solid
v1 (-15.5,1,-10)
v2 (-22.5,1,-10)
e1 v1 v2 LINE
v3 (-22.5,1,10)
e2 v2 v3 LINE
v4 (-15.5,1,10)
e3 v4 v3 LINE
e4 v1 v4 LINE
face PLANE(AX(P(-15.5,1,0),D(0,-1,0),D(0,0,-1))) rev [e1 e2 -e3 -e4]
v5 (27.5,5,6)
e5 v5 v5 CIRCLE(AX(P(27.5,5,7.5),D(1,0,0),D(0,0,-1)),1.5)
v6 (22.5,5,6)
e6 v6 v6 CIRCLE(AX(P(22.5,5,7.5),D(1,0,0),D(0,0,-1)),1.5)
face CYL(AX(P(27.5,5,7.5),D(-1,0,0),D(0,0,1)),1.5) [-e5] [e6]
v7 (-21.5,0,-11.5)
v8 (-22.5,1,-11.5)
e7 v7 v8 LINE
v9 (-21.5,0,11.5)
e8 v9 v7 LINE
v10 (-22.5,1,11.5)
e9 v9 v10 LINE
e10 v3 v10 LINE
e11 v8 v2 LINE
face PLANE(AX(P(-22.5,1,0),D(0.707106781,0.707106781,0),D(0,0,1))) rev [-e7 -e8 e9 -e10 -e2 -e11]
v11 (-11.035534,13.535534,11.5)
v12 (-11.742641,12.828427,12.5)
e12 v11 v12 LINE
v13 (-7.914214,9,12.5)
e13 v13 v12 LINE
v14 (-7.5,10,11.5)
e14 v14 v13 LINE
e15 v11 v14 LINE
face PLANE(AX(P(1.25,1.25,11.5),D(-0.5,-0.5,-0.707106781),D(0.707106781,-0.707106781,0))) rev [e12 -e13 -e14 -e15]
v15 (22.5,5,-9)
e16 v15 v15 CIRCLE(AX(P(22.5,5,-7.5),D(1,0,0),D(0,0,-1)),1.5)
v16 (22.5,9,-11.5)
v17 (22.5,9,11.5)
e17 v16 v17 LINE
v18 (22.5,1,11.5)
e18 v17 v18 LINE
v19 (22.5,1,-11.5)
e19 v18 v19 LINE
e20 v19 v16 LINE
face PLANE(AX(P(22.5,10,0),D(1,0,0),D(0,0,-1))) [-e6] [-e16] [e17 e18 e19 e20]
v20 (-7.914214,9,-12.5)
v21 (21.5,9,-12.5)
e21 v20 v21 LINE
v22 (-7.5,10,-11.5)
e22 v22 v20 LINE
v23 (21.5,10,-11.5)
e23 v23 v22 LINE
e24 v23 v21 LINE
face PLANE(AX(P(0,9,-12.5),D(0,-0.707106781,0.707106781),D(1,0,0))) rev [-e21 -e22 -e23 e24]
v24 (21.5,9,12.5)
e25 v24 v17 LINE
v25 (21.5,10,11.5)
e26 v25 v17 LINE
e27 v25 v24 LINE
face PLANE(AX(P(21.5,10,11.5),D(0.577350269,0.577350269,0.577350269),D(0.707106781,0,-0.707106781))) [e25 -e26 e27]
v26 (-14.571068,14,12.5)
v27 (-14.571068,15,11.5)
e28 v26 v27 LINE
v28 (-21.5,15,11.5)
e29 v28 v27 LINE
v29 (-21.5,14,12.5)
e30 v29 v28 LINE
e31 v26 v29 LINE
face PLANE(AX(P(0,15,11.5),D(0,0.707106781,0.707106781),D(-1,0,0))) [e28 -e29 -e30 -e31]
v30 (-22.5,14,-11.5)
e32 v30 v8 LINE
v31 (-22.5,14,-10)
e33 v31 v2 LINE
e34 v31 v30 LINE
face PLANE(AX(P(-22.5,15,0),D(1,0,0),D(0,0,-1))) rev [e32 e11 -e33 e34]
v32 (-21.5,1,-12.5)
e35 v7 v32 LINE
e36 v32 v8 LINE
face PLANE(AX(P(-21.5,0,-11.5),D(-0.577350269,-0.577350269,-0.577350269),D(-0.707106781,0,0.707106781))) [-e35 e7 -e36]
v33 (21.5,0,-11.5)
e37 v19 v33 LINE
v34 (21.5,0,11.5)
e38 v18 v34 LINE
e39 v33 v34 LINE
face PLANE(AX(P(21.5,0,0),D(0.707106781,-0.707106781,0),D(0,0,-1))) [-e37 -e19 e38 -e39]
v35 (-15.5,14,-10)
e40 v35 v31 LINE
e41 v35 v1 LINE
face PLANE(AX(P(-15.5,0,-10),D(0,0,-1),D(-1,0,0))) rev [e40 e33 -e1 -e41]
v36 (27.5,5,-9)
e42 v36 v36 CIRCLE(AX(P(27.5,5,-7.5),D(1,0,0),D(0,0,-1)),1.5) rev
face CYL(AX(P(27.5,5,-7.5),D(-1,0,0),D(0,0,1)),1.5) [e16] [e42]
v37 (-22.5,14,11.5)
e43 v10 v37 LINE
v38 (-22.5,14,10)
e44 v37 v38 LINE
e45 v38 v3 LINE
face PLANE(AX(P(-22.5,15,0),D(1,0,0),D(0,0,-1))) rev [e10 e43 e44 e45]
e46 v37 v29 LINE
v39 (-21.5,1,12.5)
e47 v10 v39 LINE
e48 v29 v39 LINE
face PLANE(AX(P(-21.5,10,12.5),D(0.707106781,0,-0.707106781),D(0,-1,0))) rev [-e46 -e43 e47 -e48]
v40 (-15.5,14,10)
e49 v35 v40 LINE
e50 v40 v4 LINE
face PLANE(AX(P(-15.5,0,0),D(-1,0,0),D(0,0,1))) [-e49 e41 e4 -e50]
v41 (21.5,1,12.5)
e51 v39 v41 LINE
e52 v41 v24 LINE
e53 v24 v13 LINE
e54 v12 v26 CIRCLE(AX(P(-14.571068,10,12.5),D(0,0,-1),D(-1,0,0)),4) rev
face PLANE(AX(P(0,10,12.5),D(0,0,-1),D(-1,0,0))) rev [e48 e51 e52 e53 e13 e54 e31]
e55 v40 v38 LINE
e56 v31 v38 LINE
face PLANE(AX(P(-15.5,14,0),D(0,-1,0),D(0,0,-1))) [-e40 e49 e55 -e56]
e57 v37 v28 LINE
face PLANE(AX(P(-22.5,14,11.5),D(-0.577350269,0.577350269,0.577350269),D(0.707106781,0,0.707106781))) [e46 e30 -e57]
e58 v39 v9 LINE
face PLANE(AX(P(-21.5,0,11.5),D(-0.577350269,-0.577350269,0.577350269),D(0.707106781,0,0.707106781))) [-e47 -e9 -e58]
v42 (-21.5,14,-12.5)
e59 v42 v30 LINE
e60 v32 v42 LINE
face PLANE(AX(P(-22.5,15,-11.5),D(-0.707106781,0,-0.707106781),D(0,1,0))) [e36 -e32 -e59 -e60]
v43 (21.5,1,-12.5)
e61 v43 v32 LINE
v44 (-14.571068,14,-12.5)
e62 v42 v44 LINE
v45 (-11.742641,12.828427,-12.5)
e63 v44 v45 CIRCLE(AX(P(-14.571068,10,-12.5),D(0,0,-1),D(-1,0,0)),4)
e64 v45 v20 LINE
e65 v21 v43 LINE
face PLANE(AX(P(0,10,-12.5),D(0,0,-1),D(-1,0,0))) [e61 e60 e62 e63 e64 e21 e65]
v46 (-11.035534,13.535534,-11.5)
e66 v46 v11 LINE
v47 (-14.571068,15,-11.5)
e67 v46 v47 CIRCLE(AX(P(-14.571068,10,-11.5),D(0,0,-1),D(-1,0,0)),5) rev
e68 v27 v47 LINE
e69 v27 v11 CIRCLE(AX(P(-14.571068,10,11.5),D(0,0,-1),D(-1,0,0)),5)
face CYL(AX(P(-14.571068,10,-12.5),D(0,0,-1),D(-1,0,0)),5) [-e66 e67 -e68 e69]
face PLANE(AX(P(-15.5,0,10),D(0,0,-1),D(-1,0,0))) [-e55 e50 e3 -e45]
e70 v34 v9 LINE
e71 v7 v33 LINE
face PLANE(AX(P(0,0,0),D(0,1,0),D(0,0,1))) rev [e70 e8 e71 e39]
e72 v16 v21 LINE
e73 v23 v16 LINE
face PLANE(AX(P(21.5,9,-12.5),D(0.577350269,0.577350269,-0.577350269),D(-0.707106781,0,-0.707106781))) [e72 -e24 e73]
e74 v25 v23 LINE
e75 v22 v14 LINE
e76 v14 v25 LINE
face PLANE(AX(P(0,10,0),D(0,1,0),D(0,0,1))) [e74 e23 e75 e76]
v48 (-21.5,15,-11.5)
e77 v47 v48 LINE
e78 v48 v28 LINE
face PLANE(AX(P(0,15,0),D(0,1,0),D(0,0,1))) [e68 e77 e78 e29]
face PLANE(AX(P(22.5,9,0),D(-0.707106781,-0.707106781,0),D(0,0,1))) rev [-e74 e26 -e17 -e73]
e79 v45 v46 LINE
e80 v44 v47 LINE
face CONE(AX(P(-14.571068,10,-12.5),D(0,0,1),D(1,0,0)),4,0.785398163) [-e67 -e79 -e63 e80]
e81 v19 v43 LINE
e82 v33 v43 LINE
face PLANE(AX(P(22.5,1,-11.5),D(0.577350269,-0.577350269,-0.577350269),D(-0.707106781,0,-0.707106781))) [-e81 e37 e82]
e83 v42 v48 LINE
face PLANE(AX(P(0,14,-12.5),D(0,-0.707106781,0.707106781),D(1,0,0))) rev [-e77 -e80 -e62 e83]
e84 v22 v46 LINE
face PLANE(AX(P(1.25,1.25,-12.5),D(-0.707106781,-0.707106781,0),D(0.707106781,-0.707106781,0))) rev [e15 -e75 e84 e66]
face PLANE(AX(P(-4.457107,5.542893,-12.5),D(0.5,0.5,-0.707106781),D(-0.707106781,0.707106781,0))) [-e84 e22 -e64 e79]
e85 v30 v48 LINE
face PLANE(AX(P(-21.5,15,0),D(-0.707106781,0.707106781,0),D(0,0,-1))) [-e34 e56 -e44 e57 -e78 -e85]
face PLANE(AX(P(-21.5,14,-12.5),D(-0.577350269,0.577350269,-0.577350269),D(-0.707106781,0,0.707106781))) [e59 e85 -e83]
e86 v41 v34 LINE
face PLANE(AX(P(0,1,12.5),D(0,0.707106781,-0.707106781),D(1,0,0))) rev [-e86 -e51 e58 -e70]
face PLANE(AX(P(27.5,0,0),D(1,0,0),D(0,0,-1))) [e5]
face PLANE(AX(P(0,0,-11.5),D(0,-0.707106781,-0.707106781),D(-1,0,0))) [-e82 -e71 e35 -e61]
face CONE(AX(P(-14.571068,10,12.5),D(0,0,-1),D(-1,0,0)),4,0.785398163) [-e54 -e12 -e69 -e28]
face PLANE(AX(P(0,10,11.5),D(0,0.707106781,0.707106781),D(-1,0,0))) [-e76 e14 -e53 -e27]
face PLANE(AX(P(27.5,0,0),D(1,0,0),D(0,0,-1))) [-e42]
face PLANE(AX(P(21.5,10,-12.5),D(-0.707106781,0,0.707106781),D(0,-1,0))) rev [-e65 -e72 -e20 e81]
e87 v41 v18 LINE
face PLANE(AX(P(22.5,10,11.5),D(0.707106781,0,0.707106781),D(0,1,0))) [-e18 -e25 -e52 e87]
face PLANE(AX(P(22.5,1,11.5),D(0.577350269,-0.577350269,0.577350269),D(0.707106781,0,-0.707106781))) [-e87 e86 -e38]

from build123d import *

# Parameters (mm, degrees)
SKETCH_1_W          = 35
SKETCH_1_H          = 25
EXTRUDE_1_DEPTH     = 10
SKETCH_1_4_W        = 10
SKETCH_1_4_H        = 25
EXTRUDE_2_DEPTH     = 15
SKETCH_2_W          = 10
SKETCH_2_H          = 13
CUT_EXTRUDE_1_DEPTH = 7
EXTRUDE_3_DEPTH     = 25
FILLET_1_R          = 5
CHAMFER_1_SIZE      = 1
SKETCH_5_R          = 1.5
EXTRUDE_4_DEPTH     = 5


with BuildPart() as part:
    # 草图1 → 凸台-拉伸1 (new body)
    with BuildSketch(Plane(origin=(0, 0, 0), x_dir=(1, 0, 0), z_dir=(0, 1, 0))):
        with Locations((5, 0)):
            Rectangle(SKETCH_1_W, SKETCH_1_H)
    extrude(amount=EXTRUDE_1_DEPTH)

    # 草图1<4> → 凸台-拉伸2 (add)
    with BuildSketch(Plane(origin=(0, 0, 0), x_dir=(1, 0, 0), z_dir=(0, 1, 0))):
        with Locations((-17.5, 0)):
            Rectangle(SKETCH_1_4_W, SKETCH_1_4_H)
    extrude(amount=EXTRUDE_2_DEPTH)

    # 草图2 → 切除-拉伸1 (cut)
    with BuildSketch(Plane.ZY.offset(22.5)):
        with Locations((5, 7.5)):
            Rectangle(SKETCH_2_W, SKETCH_2_H)
        with Locations((-5, 7.5)):
            Rectangle(SKETCH_2_W, SKETCH_2_H)
    extrude(amount=-CUT_EXTRUDE_1_DEPTH, mode=Mode.SUBTRACT)

    # 草图3 → 凸台-拉伸3 (add, through all)
    with BuildSketch(Plane.XY.offset(12.5)):
        Polygon((-7.5, 10), (-12.5, 15), (-12.5, 12.5), (-12.5, 10), (-10, 10), align=None)
    extrude(amount=-EXTRUDE_3_DEPTH)

    # 圆角1
    fillet_1_edges = [part.edges().sort_by_distance(p)[0] for p in [
        (-12.5, 15, 0),
    ]]
    fillet(fillet_1_edges, radius=FILLET_1_R)

    # 倒角1
    chamfer_1_edges = [part.edges().sort_by_distance(p)[0] for p in [
        (-18.535533906, 15, -12.5),
        (-22.5, 0, 0),
        (-22.5, 7.5, -12.5),
        (-22.5, 7.5, 12.5),
        (-22.5, 15, 0),
        (-18.535533906, 15, 12.5),
        (22.5, 10, 0),
        (7.5, 10, -12.5),
        (7.5, 10, 12.5),
        (-9.267766953, 11.767766953, 12.5),
        (-9.267766953, 11.767766953, -12.5),
        (22.5, 0, 0),
        (-12.65765065, 14.619397663, 12.5),
        (-12.65765065, 14.619397663, -12.5),
        (0, 0, 12.5),
        (0, 0, -12.5),
        (22.5, 5, -12.5),
        (22.5, 5, 12.5),
    ]]
    chamfer(chamfer_1_edges, length=CHAMFER_1_SIZE - 0.0001)  # a hair under: the kernel refuses the full size

    # 草图5 → 凸台-拉伸4 (add)
    with BuildSketch(Plane(origin=(22.5, 0, 0), x_dir=(0, 0, -1), z_dir=(1, 0, 0))):
        with Locations((-7.5, 5)):
            Circle(SKETCH_5_R)
        with Locations((7.5, 5)):
            Circle(SKETCH_5_R)
    extrude(amount=EXTRUDE_4_DEPTH)


solid = part.part
